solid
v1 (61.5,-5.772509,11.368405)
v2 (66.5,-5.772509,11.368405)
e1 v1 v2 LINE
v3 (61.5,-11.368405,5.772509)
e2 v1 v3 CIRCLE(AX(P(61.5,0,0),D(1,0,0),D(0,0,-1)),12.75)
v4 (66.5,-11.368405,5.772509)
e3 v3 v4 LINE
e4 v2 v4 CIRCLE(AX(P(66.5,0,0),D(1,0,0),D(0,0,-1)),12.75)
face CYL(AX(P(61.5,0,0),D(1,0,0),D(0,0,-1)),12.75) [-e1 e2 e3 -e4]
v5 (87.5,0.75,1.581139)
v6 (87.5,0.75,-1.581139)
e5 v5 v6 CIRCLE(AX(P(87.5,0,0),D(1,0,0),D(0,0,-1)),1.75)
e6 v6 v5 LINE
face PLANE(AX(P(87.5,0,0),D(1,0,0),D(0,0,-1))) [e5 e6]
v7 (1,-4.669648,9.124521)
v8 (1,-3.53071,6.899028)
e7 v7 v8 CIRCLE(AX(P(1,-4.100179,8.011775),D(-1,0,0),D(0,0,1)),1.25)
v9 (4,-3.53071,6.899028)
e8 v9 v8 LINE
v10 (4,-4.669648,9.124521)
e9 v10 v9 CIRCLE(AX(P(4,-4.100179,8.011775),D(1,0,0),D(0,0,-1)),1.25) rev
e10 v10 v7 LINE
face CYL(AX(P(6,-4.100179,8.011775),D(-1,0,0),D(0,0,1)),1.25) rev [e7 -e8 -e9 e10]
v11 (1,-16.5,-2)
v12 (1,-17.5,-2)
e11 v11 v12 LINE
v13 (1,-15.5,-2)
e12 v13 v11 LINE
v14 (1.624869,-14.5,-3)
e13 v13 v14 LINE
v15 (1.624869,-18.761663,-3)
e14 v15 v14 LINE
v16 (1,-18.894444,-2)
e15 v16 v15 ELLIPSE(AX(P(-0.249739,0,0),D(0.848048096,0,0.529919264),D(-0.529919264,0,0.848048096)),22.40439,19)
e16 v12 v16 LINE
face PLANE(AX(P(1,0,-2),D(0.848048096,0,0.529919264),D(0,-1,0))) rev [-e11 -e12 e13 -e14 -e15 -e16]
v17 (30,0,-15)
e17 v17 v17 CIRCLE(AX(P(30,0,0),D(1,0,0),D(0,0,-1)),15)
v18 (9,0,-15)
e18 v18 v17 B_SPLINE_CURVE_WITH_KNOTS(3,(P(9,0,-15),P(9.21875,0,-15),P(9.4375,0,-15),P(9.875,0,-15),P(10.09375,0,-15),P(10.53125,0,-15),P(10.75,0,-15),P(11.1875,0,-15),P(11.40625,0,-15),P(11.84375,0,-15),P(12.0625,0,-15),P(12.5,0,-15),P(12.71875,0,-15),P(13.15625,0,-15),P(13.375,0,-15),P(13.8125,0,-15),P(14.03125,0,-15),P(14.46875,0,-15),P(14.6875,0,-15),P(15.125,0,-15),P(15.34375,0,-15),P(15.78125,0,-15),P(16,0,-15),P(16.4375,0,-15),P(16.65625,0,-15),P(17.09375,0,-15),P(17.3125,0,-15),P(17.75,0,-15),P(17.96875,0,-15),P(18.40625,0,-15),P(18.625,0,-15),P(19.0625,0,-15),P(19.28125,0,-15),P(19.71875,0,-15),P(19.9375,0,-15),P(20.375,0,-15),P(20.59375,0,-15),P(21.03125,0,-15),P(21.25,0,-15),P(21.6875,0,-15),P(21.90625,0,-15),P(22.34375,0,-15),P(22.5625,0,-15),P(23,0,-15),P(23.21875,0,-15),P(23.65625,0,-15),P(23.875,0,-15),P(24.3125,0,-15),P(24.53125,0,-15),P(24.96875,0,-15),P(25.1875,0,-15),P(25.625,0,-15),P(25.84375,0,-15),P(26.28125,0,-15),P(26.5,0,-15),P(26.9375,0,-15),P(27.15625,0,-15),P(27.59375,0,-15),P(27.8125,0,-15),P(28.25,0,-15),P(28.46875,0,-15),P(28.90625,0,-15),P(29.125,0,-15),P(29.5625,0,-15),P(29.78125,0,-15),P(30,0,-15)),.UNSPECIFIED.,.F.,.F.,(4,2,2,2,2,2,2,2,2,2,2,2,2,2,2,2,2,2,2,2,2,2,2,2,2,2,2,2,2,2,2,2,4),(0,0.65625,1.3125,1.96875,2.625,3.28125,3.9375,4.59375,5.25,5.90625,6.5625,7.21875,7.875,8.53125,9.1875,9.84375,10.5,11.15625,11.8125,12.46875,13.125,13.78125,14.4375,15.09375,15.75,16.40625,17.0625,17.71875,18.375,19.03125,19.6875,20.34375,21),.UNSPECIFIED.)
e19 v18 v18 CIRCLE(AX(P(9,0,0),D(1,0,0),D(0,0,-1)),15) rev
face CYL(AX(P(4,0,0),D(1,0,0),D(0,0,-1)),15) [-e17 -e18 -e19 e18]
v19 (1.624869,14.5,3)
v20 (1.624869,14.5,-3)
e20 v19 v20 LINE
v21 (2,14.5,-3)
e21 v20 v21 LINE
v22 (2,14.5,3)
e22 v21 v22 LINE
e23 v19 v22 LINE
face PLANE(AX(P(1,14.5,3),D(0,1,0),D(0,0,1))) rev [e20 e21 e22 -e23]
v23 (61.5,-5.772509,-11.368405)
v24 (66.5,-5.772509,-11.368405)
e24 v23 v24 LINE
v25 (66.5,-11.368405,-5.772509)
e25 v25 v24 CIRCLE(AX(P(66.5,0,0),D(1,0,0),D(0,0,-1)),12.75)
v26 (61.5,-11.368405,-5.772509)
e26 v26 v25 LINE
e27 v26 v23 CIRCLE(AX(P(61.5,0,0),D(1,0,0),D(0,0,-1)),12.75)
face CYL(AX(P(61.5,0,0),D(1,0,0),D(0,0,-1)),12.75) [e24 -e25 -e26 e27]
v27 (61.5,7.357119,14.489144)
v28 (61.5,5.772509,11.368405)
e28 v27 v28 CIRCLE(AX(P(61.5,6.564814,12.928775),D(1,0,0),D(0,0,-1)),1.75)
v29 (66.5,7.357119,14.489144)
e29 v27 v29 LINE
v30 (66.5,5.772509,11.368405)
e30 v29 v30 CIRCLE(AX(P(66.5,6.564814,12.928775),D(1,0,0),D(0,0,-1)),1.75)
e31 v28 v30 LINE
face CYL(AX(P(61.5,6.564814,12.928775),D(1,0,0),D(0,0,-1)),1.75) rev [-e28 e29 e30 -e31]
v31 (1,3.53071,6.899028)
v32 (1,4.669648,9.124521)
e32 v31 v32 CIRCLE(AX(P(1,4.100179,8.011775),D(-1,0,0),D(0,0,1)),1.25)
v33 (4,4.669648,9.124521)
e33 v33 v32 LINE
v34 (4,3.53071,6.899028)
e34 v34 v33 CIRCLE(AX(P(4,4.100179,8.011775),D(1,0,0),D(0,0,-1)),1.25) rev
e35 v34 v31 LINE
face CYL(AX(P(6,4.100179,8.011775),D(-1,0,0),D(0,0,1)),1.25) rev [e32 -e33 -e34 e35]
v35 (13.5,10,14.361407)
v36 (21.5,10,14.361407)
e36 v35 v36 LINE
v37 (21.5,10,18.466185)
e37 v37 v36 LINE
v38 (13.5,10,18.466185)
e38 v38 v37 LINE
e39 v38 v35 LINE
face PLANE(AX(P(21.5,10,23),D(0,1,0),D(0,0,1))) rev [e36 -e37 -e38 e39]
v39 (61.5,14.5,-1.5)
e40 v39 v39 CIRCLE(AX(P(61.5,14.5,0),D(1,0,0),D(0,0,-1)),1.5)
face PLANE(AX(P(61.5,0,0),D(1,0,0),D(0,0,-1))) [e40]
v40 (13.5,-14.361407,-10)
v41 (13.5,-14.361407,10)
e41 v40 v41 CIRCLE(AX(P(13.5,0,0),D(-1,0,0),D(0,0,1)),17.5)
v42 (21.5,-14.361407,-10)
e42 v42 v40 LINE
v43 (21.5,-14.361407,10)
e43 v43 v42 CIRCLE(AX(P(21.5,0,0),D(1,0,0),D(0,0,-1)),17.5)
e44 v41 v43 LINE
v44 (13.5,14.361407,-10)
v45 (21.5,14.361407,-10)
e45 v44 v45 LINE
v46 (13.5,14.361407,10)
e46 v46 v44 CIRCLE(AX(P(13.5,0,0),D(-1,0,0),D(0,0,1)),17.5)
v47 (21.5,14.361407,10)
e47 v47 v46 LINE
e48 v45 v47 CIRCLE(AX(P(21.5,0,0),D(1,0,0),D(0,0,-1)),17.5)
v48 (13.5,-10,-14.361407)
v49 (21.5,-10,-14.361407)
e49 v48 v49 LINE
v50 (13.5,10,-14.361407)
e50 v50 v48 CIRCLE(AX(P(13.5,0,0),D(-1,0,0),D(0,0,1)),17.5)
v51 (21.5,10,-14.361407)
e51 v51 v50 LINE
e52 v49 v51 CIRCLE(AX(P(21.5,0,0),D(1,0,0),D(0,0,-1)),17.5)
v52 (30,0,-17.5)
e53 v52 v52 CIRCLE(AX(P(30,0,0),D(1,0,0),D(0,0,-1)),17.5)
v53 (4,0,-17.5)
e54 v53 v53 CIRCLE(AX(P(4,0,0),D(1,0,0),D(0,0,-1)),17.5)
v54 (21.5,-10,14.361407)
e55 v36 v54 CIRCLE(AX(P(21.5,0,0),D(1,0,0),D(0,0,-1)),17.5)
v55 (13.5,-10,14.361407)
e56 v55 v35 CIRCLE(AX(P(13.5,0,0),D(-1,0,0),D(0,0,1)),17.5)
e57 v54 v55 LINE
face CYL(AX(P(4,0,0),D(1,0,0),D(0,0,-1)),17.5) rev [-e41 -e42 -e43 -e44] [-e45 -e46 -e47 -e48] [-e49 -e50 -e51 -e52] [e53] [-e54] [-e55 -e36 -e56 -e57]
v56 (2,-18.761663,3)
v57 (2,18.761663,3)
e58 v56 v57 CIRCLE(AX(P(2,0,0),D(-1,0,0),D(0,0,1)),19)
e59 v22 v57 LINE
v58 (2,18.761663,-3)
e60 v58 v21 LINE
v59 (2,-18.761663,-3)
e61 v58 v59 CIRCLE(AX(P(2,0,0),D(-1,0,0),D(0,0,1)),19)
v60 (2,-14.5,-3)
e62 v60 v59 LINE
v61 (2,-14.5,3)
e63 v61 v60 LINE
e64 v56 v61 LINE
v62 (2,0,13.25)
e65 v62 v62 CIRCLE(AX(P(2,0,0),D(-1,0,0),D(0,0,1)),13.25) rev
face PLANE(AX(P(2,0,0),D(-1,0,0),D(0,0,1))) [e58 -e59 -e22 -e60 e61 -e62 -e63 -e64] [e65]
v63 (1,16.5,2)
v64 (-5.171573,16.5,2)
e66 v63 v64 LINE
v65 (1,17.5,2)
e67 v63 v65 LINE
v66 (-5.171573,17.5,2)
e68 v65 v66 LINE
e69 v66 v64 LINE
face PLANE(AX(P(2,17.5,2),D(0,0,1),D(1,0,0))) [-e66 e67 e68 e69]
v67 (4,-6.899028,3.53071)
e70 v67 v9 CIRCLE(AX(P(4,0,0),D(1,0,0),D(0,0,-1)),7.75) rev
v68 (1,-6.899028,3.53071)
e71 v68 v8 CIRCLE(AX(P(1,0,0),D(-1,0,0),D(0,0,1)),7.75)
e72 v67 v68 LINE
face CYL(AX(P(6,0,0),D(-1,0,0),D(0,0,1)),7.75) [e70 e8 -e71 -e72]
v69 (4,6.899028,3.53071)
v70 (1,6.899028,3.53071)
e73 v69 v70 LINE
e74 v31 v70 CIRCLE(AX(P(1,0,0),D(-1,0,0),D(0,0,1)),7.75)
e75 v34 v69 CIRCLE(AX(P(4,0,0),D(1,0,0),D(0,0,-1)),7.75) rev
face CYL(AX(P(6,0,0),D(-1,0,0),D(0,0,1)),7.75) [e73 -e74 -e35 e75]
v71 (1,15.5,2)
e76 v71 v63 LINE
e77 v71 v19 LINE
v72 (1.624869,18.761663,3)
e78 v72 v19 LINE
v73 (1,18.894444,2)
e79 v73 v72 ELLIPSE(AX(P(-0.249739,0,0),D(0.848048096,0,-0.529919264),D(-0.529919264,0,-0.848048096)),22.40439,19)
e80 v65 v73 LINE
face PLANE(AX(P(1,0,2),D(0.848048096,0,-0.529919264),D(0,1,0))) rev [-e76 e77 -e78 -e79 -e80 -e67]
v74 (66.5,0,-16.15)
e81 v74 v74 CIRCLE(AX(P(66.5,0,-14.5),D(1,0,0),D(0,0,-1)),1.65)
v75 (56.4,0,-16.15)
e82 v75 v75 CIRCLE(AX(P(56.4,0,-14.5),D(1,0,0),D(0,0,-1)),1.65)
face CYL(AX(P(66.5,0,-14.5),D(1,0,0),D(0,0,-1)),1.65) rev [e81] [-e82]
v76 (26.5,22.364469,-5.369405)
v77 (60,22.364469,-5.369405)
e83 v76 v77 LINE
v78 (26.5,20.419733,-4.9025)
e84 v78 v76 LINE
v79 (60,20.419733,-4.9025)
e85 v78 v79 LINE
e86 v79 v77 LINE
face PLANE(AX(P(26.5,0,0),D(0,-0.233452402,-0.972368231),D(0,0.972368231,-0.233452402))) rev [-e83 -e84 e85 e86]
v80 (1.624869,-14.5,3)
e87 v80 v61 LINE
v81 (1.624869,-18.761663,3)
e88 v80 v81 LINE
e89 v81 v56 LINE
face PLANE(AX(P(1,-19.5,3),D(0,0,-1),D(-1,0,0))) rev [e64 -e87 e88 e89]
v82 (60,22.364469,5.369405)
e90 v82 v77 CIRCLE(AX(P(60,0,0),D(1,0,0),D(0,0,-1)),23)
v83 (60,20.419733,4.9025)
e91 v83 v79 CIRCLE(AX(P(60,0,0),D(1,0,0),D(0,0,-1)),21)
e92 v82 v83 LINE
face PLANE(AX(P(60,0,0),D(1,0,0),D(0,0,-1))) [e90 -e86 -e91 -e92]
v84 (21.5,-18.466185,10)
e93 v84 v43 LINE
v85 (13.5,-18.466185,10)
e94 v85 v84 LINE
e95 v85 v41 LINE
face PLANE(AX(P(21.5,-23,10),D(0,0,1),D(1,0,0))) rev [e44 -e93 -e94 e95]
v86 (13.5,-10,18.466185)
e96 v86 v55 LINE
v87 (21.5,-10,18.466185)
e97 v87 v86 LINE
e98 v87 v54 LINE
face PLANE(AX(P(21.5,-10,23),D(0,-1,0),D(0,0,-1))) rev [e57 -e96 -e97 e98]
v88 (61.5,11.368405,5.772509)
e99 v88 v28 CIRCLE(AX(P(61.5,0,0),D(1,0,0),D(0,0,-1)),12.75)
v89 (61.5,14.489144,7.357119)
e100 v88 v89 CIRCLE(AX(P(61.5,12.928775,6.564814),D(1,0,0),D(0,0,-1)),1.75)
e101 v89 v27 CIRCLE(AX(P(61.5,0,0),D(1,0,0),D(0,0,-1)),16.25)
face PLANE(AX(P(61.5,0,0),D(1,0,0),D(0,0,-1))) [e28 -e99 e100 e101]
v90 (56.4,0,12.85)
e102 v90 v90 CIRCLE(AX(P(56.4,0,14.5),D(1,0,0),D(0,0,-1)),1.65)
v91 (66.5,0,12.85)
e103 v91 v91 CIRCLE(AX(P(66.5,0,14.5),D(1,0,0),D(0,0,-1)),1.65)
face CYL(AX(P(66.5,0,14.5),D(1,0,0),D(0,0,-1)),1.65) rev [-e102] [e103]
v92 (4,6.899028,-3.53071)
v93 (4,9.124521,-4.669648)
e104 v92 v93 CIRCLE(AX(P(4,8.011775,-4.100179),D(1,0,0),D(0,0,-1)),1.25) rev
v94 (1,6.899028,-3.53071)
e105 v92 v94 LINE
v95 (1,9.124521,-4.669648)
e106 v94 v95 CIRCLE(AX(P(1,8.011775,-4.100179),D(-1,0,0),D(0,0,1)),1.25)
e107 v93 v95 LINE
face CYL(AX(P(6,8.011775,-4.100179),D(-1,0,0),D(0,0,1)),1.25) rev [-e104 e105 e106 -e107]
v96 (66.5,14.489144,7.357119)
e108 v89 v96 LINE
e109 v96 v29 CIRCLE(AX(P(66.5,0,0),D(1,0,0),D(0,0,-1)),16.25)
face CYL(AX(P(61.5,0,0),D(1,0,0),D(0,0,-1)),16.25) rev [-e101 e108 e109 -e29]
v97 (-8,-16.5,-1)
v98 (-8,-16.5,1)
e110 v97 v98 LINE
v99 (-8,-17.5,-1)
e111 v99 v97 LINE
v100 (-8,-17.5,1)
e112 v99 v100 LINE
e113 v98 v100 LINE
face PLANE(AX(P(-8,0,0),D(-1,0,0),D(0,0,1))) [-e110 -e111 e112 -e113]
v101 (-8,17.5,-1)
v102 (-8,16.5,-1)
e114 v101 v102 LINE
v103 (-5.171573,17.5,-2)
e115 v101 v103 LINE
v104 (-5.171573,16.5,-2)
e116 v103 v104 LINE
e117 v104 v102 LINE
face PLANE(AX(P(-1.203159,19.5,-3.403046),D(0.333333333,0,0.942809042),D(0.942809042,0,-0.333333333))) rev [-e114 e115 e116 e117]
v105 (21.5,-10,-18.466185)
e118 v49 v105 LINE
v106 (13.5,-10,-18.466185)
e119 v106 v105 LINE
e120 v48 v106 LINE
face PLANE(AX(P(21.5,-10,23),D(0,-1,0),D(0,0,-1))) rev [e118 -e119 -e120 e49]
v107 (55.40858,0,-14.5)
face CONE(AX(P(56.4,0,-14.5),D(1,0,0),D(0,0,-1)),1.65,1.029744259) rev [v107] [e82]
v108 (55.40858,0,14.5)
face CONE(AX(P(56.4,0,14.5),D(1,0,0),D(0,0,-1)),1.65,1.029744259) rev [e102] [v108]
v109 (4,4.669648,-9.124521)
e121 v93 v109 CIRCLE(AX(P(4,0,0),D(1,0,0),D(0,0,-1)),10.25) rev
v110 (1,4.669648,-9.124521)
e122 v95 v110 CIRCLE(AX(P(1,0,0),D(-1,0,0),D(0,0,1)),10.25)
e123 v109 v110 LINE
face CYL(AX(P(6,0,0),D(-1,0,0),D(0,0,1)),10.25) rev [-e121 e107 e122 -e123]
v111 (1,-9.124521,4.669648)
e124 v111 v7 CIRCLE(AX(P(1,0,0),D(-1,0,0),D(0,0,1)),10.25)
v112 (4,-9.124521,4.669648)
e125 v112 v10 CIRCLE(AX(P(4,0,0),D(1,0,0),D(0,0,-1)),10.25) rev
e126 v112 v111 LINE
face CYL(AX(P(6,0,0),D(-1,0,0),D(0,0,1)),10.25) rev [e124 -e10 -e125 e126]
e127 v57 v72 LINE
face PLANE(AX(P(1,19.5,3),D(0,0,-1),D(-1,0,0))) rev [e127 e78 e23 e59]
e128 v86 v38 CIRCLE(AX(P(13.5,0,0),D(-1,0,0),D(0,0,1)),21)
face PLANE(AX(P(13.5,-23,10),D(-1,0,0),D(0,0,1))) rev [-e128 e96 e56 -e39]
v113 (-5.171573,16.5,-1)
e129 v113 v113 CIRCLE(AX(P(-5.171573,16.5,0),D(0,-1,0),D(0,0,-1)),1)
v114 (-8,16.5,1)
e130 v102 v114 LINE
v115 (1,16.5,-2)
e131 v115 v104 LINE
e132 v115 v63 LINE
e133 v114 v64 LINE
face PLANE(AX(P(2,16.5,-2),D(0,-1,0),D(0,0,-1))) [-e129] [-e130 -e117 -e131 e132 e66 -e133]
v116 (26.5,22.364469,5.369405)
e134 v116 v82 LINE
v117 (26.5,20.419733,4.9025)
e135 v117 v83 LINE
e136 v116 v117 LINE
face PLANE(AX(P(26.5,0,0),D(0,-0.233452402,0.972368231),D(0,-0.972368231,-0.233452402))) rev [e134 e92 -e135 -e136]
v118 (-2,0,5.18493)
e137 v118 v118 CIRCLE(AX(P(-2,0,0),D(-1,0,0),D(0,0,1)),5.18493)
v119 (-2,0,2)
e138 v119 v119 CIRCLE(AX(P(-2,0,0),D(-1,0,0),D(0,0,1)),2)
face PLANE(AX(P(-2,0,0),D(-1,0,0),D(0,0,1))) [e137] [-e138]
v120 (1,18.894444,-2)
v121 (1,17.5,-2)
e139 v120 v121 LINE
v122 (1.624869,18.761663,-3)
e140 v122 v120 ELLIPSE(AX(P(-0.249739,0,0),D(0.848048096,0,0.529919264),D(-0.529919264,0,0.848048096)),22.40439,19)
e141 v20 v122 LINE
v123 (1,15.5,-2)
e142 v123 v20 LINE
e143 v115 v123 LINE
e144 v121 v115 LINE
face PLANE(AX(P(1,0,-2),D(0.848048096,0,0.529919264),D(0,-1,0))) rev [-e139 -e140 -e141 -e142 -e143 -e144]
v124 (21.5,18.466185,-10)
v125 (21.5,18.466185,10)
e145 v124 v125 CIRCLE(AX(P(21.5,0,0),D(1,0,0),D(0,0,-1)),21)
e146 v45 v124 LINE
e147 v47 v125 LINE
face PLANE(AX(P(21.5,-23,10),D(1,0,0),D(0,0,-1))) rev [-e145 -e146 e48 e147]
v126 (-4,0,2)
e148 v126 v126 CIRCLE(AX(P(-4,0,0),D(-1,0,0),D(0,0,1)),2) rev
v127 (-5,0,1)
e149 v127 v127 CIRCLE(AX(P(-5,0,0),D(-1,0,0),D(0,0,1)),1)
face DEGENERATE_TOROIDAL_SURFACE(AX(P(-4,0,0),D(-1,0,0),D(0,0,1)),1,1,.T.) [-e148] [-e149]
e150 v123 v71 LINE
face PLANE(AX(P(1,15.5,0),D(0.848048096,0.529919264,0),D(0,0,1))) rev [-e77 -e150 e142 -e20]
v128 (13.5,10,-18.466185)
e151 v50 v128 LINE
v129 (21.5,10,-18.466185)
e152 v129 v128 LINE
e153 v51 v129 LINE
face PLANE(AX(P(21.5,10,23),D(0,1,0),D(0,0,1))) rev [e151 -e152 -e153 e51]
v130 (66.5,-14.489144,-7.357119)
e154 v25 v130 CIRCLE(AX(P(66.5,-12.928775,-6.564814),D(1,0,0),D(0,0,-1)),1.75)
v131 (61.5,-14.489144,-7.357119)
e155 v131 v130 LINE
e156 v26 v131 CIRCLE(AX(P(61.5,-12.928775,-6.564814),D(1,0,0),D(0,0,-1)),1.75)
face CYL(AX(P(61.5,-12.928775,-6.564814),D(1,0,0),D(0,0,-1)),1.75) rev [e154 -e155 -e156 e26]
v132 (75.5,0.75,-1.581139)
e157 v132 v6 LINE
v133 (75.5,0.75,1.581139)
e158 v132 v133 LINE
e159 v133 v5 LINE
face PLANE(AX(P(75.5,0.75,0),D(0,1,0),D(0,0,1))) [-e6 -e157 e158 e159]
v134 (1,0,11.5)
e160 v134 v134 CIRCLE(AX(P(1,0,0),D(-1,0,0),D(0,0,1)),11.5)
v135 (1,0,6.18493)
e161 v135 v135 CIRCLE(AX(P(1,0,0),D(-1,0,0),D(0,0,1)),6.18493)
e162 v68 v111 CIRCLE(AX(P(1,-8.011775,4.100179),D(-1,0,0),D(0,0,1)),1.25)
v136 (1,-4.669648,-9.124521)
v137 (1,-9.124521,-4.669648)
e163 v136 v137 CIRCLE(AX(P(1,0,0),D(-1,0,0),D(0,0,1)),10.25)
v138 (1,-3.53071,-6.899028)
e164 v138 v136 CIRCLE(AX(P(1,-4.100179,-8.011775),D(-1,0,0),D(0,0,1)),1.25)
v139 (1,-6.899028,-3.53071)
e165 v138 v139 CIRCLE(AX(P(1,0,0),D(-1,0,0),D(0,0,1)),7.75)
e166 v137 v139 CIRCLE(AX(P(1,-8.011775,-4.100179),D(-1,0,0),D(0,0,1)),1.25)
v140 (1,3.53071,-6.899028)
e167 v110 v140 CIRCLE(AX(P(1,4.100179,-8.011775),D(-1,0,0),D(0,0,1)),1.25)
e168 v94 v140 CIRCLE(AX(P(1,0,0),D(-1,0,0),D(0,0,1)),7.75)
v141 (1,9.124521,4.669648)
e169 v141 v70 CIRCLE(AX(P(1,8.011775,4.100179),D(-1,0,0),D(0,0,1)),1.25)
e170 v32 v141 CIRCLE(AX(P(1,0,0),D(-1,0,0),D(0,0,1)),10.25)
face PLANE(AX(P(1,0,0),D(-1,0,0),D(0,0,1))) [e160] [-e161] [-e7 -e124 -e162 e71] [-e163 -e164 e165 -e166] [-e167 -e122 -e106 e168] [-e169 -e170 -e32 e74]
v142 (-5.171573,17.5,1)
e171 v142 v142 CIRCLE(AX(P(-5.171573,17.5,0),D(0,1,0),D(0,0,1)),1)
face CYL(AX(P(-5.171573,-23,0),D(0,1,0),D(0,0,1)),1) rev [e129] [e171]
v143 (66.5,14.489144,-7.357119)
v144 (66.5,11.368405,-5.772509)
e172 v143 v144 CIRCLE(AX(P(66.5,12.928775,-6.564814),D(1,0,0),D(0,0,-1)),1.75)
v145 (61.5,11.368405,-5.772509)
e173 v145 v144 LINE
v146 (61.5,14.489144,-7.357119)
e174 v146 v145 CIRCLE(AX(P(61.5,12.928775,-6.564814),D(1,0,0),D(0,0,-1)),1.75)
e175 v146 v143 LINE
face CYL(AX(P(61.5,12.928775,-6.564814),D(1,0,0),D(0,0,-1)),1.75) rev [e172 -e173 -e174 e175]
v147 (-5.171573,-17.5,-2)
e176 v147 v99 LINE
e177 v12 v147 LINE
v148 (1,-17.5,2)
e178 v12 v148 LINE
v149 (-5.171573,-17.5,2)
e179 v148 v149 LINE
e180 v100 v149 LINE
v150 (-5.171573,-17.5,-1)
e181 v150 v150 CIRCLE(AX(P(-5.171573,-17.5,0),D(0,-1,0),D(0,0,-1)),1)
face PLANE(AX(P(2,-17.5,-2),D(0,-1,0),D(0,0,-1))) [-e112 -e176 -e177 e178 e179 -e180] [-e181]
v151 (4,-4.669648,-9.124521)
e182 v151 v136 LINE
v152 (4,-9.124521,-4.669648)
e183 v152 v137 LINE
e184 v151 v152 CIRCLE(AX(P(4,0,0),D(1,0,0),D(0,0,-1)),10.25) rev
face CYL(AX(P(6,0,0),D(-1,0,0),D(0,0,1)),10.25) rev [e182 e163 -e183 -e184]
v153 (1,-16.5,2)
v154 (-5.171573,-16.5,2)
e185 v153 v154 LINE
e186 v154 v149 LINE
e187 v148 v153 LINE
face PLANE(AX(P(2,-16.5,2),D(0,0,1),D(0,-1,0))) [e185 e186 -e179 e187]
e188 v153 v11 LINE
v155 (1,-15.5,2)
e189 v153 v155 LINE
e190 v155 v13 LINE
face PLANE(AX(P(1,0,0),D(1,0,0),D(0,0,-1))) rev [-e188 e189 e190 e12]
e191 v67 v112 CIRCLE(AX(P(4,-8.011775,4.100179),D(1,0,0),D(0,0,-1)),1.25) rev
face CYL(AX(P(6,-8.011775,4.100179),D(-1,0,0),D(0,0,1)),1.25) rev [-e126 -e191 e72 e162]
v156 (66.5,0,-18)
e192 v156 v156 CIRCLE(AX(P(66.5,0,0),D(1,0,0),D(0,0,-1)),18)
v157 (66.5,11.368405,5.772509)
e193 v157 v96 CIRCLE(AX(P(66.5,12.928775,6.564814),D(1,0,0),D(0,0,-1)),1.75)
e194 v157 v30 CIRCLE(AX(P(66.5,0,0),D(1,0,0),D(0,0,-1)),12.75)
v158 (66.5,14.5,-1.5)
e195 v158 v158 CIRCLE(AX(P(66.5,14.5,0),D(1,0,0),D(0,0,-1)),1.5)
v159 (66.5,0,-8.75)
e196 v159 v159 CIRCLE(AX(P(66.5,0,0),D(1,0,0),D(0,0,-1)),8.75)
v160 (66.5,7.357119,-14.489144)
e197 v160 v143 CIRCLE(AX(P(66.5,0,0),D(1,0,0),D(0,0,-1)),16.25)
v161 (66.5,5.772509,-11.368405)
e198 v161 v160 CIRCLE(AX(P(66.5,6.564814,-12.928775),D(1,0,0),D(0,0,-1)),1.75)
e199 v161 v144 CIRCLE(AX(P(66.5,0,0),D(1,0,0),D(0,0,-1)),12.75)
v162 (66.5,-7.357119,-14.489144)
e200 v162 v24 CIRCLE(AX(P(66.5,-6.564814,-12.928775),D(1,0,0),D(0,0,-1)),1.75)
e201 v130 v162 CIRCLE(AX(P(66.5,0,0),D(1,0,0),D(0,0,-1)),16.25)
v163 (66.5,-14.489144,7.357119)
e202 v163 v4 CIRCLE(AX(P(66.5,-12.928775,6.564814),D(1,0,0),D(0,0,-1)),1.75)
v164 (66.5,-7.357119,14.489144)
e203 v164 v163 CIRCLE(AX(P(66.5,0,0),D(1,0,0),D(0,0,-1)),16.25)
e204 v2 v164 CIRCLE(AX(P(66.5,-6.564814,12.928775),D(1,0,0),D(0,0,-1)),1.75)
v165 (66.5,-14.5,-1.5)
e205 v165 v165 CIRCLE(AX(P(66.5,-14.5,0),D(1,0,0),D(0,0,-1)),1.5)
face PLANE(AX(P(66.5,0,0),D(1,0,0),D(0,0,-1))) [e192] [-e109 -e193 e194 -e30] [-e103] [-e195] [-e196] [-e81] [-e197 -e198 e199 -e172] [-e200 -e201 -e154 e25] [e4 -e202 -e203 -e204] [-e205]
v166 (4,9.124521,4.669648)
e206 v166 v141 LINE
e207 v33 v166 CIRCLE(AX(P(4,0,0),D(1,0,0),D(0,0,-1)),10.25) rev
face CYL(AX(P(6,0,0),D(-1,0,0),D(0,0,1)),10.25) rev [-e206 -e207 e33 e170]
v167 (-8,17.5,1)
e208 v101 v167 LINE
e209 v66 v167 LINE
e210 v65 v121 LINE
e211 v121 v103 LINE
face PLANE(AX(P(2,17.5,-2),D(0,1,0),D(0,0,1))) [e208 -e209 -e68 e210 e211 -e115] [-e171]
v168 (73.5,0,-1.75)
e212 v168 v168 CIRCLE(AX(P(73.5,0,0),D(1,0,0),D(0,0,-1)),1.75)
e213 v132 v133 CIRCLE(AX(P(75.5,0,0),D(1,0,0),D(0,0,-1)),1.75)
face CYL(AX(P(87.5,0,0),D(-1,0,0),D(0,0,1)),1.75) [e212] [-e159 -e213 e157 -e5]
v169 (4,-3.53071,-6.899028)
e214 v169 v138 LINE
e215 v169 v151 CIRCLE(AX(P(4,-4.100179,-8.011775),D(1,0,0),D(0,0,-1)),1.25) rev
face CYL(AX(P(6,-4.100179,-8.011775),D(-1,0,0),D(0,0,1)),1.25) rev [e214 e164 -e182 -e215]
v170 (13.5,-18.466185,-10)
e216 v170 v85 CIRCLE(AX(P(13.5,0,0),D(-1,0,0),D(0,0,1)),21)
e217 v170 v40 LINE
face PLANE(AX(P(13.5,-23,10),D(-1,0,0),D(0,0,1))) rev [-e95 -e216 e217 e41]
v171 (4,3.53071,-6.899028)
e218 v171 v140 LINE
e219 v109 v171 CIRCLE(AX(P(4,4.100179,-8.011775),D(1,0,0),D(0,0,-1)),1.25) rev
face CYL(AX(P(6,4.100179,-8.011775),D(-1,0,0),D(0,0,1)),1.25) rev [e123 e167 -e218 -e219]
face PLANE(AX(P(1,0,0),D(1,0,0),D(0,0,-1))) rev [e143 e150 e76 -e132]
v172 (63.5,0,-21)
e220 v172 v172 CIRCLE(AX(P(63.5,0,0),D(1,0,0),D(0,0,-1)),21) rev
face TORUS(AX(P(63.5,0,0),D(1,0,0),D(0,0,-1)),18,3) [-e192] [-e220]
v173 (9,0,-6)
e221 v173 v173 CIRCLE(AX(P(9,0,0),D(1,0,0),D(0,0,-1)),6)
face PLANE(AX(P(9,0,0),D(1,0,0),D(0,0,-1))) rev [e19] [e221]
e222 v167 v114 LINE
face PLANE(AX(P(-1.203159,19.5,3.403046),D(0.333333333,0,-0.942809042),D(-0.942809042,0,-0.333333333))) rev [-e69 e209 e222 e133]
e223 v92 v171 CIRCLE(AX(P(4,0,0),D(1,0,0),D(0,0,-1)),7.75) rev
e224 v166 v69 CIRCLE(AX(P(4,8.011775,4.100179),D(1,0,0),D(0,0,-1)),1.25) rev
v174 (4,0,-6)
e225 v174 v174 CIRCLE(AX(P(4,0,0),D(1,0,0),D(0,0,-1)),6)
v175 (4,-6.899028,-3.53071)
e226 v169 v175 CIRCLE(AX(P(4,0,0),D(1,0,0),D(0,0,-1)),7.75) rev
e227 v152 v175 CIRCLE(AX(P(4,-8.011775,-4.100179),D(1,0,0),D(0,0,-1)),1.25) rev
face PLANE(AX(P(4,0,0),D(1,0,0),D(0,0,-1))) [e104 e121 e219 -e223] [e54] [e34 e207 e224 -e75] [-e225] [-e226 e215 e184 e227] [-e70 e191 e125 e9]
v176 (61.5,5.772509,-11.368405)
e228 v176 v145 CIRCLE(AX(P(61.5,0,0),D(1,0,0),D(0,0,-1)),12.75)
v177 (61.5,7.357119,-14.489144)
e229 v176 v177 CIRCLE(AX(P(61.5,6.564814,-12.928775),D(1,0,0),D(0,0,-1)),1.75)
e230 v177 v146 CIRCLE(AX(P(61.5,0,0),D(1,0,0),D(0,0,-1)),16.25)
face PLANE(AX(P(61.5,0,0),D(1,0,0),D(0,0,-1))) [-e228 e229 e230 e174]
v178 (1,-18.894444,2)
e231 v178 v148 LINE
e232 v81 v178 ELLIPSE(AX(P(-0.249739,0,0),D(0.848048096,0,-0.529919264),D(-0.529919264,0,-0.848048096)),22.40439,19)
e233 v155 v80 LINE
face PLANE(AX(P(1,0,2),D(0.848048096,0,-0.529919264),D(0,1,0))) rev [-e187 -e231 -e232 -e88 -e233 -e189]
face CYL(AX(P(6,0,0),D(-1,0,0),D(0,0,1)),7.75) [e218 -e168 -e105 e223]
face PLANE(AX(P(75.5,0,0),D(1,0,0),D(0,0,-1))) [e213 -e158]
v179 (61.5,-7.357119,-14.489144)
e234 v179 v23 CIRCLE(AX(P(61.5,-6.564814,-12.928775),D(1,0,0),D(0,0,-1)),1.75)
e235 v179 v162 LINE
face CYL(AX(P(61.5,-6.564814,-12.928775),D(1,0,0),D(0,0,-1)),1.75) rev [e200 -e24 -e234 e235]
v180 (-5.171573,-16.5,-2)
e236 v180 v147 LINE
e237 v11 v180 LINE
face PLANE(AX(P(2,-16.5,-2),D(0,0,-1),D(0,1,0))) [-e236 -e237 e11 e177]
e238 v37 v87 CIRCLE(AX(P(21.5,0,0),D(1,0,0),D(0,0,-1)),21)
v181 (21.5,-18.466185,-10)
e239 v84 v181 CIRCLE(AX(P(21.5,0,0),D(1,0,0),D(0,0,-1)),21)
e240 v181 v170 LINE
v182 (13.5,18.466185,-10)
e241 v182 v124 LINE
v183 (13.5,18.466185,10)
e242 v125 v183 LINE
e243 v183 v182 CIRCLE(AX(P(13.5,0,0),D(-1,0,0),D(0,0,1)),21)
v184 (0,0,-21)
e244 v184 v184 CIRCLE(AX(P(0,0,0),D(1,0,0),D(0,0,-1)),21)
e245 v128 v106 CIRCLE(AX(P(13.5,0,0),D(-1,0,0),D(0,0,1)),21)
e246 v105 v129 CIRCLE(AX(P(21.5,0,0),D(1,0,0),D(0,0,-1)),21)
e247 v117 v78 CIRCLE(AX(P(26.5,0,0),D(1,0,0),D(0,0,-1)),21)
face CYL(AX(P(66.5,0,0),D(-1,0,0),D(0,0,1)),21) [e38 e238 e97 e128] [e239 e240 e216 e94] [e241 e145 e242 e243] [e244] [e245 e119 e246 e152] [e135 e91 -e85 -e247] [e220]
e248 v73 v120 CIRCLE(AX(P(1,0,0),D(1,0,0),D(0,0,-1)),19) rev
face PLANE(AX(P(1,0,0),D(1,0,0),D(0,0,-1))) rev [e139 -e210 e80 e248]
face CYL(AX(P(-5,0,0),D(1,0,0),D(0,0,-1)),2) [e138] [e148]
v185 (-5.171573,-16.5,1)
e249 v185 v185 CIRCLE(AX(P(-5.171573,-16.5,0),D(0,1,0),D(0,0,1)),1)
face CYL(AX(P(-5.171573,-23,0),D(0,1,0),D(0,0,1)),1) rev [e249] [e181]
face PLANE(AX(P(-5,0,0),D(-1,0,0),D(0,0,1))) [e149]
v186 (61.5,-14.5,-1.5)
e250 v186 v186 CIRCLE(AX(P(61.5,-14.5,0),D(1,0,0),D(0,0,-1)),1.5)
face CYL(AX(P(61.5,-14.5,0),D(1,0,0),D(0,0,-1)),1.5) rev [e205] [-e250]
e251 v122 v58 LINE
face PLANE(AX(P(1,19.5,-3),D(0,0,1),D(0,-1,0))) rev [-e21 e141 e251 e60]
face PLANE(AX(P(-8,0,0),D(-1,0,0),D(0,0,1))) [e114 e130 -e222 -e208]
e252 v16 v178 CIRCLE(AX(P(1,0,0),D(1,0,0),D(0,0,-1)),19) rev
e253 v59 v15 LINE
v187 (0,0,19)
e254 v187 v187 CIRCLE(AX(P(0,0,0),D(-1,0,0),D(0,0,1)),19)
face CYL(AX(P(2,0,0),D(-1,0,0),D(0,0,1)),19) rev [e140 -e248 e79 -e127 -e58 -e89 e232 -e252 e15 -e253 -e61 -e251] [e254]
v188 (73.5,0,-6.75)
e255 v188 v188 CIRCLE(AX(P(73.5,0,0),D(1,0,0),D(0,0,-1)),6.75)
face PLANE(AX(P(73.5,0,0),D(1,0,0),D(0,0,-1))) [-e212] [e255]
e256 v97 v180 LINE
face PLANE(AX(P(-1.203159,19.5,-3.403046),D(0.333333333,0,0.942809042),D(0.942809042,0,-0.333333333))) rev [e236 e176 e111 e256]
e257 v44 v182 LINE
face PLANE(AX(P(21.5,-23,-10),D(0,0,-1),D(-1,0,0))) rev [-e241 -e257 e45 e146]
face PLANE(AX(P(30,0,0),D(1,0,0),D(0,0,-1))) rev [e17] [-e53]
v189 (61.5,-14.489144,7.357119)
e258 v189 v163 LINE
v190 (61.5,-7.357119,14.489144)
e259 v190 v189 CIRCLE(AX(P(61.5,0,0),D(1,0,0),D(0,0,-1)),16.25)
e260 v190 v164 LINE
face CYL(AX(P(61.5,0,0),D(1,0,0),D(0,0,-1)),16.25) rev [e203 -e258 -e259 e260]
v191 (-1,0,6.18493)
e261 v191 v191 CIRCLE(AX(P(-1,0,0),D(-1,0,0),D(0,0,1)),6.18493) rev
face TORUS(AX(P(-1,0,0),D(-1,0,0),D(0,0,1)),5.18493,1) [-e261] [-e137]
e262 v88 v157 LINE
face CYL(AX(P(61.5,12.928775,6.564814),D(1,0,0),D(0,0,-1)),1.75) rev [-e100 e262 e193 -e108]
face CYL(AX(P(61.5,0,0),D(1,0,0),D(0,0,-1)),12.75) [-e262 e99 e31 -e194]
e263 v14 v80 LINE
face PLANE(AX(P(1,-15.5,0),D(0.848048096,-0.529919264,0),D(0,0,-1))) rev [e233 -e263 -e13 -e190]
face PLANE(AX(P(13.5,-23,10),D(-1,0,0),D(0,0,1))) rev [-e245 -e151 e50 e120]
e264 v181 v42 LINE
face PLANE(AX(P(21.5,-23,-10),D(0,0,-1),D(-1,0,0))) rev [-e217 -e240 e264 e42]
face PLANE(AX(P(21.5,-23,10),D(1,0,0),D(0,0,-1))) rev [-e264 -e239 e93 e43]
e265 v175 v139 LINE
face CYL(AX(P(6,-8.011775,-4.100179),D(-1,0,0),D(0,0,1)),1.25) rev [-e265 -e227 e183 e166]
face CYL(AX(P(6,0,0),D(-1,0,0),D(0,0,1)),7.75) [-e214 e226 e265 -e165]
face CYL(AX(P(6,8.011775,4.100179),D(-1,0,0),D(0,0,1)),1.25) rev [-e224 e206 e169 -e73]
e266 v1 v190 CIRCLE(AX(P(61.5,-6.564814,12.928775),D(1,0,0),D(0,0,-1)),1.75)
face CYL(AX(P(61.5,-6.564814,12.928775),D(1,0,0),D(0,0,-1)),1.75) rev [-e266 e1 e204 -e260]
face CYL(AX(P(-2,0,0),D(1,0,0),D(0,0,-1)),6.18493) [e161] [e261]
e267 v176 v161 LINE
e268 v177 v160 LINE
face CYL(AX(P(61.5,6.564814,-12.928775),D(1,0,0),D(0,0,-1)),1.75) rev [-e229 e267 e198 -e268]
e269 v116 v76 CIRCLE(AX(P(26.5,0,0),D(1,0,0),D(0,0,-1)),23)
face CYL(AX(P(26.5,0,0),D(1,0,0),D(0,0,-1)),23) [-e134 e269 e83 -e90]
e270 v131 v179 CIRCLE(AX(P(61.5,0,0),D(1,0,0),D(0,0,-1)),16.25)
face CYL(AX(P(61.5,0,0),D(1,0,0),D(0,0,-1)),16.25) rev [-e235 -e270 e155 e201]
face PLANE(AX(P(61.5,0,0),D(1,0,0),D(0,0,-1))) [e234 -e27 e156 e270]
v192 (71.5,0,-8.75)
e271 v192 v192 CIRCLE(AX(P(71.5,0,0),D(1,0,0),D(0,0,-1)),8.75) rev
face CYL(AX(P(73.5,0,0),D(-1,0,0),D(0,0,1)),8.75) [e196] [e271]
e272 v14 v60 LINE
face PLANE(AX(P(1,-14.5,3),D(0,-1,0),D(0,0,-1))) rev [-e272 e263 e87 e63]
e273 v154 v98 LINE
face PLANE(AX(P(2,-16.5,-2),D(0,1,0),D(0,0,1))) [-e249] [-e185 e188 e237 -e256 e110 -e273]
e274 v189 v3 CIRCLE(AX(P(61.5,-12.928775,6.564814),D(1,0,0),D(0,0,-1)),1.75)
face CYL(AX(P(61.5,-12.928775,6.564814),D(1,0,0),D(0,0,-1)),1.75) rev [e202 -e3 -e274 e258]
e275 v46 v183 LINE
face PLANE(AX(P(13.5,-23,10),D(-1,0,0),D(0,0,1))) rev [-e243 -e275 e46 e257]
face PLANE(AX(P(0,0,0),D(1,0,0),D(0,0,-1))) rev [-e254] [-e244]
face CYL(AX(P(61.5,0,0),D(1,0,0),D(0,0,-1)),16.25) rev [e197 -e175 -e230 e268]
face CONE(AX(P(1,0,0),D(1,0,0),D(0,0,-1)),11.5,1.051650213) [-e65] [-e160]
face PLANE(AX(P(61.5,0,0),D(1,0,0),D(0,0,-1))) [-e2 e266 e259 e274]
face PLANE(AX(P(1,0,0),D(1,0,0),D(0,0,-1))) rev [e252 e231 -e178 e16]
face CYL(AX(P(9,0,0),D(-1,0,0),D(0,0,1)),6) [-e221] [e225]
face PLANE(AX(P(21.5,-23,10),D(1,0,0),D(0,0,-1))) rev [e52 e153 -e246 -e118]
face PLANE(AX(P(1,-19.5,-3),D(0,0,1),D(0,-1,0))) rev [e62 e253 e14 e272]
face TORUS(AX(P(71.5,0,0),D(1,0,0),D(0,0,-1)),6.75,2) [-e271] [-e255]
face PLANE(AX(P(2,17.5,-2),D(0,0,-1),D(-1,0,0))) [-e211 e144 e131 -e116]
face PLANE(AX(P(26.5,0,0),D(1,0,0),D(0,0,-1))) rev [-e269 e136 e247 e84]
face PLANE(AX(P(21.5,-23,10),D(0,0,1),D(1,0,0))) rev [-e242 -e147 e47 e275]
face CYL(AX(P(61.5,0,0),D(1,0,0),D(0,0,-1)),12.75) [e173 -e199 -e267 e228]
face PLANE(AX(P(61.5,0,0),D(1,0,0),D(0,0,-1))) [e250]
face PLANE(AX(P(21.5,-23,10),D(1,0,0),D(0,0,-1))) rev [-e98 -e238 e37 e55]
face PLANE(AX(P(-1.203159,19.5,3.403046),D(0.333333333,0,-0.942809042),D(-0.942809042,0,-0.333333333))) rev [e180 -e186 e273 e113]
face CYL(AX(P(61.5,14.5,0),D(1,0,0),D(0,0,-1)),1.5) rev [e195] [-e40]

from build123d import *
from OCP.BRepFilletAPI import BRepFilletAPI_MakeChamfer

# Parameters (mm, degrees)
SKETCH1_R               = 21
BOSS_EXTRUDE1_DEPTH     = 66.5
FILLET1_R               = 3
SKETCH2_R               = 8.75
BOSS_EXTRUDE2_DEPTH     = 7
FILLET2_R               = 2
SKETCH3_R               = 1.75
BOSS_EXTRUDE3_DEPTH     = 14
BOSS_EXTRUDE4_START     = -33.5
BOSS_EXTRUDE4_DEPTH     = 33.5
SKETCH5_R               = 19
SKETCH5_W               = 4
SKETCH5_H               = 1
CUT_EXTRUDE1_DEPTH      = 2
SKETCH5_3_W             = 4
SKETCH5_3_H             = 1
BOSS_EXTRUDE5_DEPTH     = 8
CUT_EXTRUDE2_DEPTH      = 37
SKETCH7_W               = 8
SKETCH7_H               = 20
CUT_EXTRUDE3_DEPTH      = 101.604423362
CIRPATTERN1_COUNT       = 2
CIRPATTERN1_ANGLE       = 90
SKETCH9_R               = 17.5
BOSS_EXTRUDE6_DEPTH     = 64.5
CUT_EXTRUDE4_DEPTH      = 100.123660142
CUT_EXTRUDE4_DEPTH_BACK = 100.123660142
SKETCH10_R              = 1
M4_TAPPED_HOLE1_D       = 3.3
M4_TAPPED_HOLE1_DEPTH   = 10.1
M4_TAPPED_HOLE1_TIP     = 0.991420021
SKETCH11_R              = 1.5
CUT_EXTRUDE6_DEPTH      = 5
SKETCH13_R              = 15
BOSS_EXTRUDE7_DEPTH     = 1
CHAMFER1_SIZE           = 2
CHAMFER1_SIZE_2         = 3.5
SKETCH15_W              = 6
SKETCH15_H              = 5
BOSS_EXTRUDE8_DEPTH     = 1
CHAMFER2_SIZE           = 1
CHAMFER2_SIZE_2         = 0.624869352
SKETCH17_R              = 6.184929539
BOSS_EXTRUDE9_DEPTH     = 3
FILLET3_R               = 1
SKETCH19_R              = 2
BOSS_EXTRUDE10_DEPTH    = 3
FILLET4_R               = 1
CUT_EXTRUDE7_DEPTH      = 5
CUT_EXTRUDE8_START      = -26
SKETCH22_R              = 17.5
SKETCH22_R_2            = 15
CUT_EXTRUDE8_DEPTH      = 26
SKETCH23_R              = 17.5
SKETCH23_R_2            = 6
CUT_EXTRUDE9_DEPTH      = 5
CUT_EXTRUDE10_START     = -12
CUT_EXTRUDE10_DEPTH     = 12


# Some blends are built 0.0001 mm under size
with BuildPart() as part:
    # Sketch1 → Boss-Extrude1 (new body)
    with BuildSketch(Plane(origin=(0, 0, 0), x_dir=(0, 0, -1), z_dir=(1, 0, 0))):
        Circle(SKETCH1_R)
    extrude(amount=BOSS_EXTRUDE1_DEPTH)

    # Fillet1
    fillet1_edges = [part.edges().sort_by_distance(p)[0] for p in [
        (66.5, 0, 21),
    ]]
    fillet(fillet1_edges, radius=FILLET1_R)

    # Sketch2 → Boss-Extrude2 (add)
    with BuildSketch(Plane(origin=(66.5, 0, 0), x_dir=(0, 0, -1), z_dir=(1, 0, 0))):
        Circle(SKETCH2_R)
    extrude(amount=BOSS_EXTRUDE2_DEPTH)

    # Fillet2
    fillet2_edges = [part.edges().sort_by_distance(p)[0] for p in [
        (73.5, 0, 8.75),
    ]]
    fillet(fillet2_edges, radius=FILLET2_R)

    # Sketch3 → Boss-Extrude3 (add)
    with BuildSketch(Plane(origin=(73.5, 0, 0), x_dir=(0, 0, -1), z_dir=(1, 0, 0))):
        Circle(SKETCH3_R)
    extrude(amount=BOSS_EXTRUDE3_DEPTH)

    # Sketch4 → Boss-Extrude4 (add)
    with BuildSketch(Plane(origin=(60, 0, 0), x_dir=(0, 0, -1), z_dir=(1, 0, 0)).offset(BOSS_EXTRUDE4_START)):
        with BuildLine():
            Line((-4.902500441, 20.419732844), (-5.369405245, 22.364469305))
            ThreePointArc((-5.369405245, 22.364469305), (-14.239095466, -18.062340942), (23, 0))
            ThreePointArc((23, 0), (18.062340942, 14.239095466), (5.369405245, 22.364469305))
            Line((5.369405245, 22.364469305), (4.902500441, 20.419732844))
            ThreePointArc((4.902500441, 20.419732844), (16.491702599, 13.000913251), (21, 0))
            ThreePointArc((21, 0), (-13.000913251, -16.491702599), (-4.902500441, 20.419732844))
        make_face()
    extrude(amount=BOSS_EXTRUDE4_DEPTH)

    # Sketch5 → Cut-Extrude1 (cut)
    with BuildSketch(Plane.ZY):
        Circle(SKETCH5_R)
        with Locations((0, 17)):
            Rectangle(SKETCH5_W, SKETCH5_H, mode=Mode.SUBTRACT)
        with Locations((0, -17)):
            Rectangle(SKETCH5_W, SKETCH5_H, mode=Mode.SUBTRACT)
    extrude(amount=-CUT_EXTRUDE1_DEPTH, mode=Mode.SUBTRACT)

    # Sketch5<3> → Boss-Extrude5 (add)
    with BuildSketch(Plane.ZY):
        with Locations((0, 17)):
            Rectangle(SKETCH5_3_W, SKETCH5_3_H)
        with Locations((0, -17)):
            Rectangle(SKETCH5_3_W, SKETCH5_3_H)
    extrude(amount=BOSS_EXTRUDE5_DEPTH)

    # Sketch6 → Cut-Extrude2 (cut)
    with BuildSketch(Plane.XZ.offset(17.5)):
        Polygon((-8, -2), (-5.171572875, -2), (-8, -1), align=None)
        Polygon((-8, 2), (-8, 1), (-5.171572875, 2), align=None)
    extrude(amount=-CUT_EXTRUDE2_DEPTH, mode=Mode.SUBTRACT)

    # Sketch7 → Cut-Extrude3 (cut, through all)
    with BuildSketch(Plane(origin=(0, 21, 0), x_dir=(1, 0, 0), z_dir=(0, 1, 0))):
        with Locations((17.5, 0)):
            Rectangle(SKETCH7_W, SKETCH7_H)
    cut_extrude3 = extrude(amount=-CUT_EXTRUDE3_DEPTH, mode=Mode.SUBTRACT)

    # CirPattern1: Cut-Extrude3 ×2 about axis
    cirpattern1_axis = Axis((0, 0, 0), (-1, 0, 0))
    for i in range(1, CIRPATTERN1_COUNT):
        add(cut_extrude3.rotate(cirpattern1_axis, i * CIRPATTERN1_ANGLE / (CIRPATTERN1_COUNT - 1)), mode=Mode.SUBTRACT)

    # Sketch9 → Boss-Extrude6 (add)
    with BuildSketch(Plane.ZY.offset(-2)):
        Circle(SKETCH9_R)
    extrude(amount=-BOSS_EXTRUDE6_DEPTH)

    # Sketch10 → Cut-Extrude4 (cut, two sides: drawn at the far end of the back side and taken through both)
    with BuildSketch(Plane(origin=(0, 17.5, 0), x_dir=(1, 0, 0), z_dir=(0, 1, 0)).offset(-CUT_EXTRUDE4_DEPTH_BACK)):
        with Locations(Location((-5.171572875, 0, 0), (0, 0, 270))):
            Circle(SKETCH10_R)
    extrude(amount=CUT_EXTRUDE4_DEPTH + CUT_EXTRUDE4_DEPTH_BACK, mode=Mode.SUBTRACT)

    # M4 Tapped Hole1
    with Locations(Plane(origin=(66.5, 0, 14.5), x_dir=(0, 0, 1), z_dir=(1, 0, 0))):
        with Locations((0, 0), (-29, 0)):
            Hole(M4_TAPPED_HOLE1_D / 2, depth=M4_TAPPED_HOLE1_DEPTH)
            with Locations((0, 0, -(M4_TAPPED_HOLE1_DEPTH + M4_TAPPED_HOLE1_TIP / 2))):  # 118° drill point
                Cone(0, M4_TAPPED_HOLE1_D / 2, M4_TAPPED_HOLE1_TIP, mode=Mode.SUBTRACT)

    # Sketch11 → Cut-Extrude6 (cut)
    with BuildSketch(Plane(origin=(66.5, 0, 0), x_dir=(0, 0, -1), z_dir=(1, 0, 0))):
        with Locations((0, -14.5)):
            Circle(SKETCH11_R)
        with Locations((0, 14.5)):
            Circle(SKETCH11_R)
        with BuildLine():
            ThreePointArc((-7.357118947, 14.48914424), (-11.490485194, 11.490485194), (-14.48914424, 7.357118947))
            ThreePointArc((-14.48914424, 7.357118947), (-13.721079977, 5.00444445), (-11.36840548, 5.772508712))
            ThreePointArc((-11.36840548, 5.772508712), (-9.01561146, 9.01561146), (-5.772508712, 11.36840548))
            ThreePointArc((-5.772508712, 11.36840548), (-5.00444445, 13.721079977), (-7.357118947, 14.48914424))
        make_face()
        with BuildLine():
            ThreePointArc((14.48914424, 7.357118947), (11.490485194, 11.490485194), (7.357118947, 14.48914424))
            ThreePointArc((7.357118947, 14.48914424), (5.00444445, 13.721079977), (5.772508712, 11.36840548))
            ThreePointArc((5.772508712, 11.36840548), (9.01561146, 9.01561146), (11.36840548, 5.772508712))
            ThreePointArc((11.36840548, 5.772508712), (13.721079977, 5.00444445), (14.48914424, 7.357118947))
        make_face()
        with BuildLine():
            ThreePointArc((7.357118947, -14.48914424), (11.490485194, -11.490485194), (14.48914424, -7.357118947))
            ThreePointArc((14.48914424, -7.357118947), (13.721079977, -5.00444445), (11.36840548, -5.772508712))
            ThreePointArc((11.36840548, -5.772508712), (9.01561146, -9.01561146), (5.772508712, -11.36840548))
            ThreePointArc((5.772508712, -11.36840548), (5.00444445, -13.721079977), (7.357118947, -14.48914424))
        make_face()
        with BuildLine():
            ThreePointArc((-14.48914424, -7.357118947), (-11.490485194, -11.490485194), (-7.357118947, -14.48914424))
            ThreePointArc((-7.357118947, -14.48914424), (-5.00444445, -13.721079977), (-5.772508712, -11.36840548))
            ThreePointArc((-5.772508712, -11.36840548), (-9.01561146, -9.01561146), (-11.36840548, -5.772508712))
            ThreePointArc((-11.36840548, -5.772508712), (-13.721079977, -5.00444445), (-14.48914424, -7.357118947))
        make_face()
    extrude(amount=-CUT_EXTRUDE6_DEPTH, mode=Mode.SUBTRACT)

    # Sketch13 → Boss-Extrude7 (add)
    with BuildSketch(Plane.ZY.offset(-2)):
        Circle(SKETCH13_R)
    extrude(amount=BOSS_EXTRUDE7_DEPTH)

    # Chamfer1
    # the kernel refuses this chamfer: 3.5, 2 mm, written as the material it takes off along each edge
    with BuildSketch(Plane(origin=(1, 0, 0), x_dir=(0, 0, 1), z_dir=(0, -1, 0))) as chamfer1_piece_1_section:
        Polygon((15, -CHAMFER1_SIZE), (15 - CHAMFER1_SIZE_2, 0), (15, 0), align=None)
    chamfer1_piece_1 = revolve(axis=Axis((1, 0, 0), (-1, 0, 0)), mode=Mode.PRIVATE)
    chamfer1_piece_1 = split(chamfer1_piece_1, bisect_by=Plane(origin=(2, 0, -12.345664859), z_dir=(-1, 0, 0)), keep=Keep.TOP, mode=Mode.PRIVATE)
    add(chamfer1_piece_1, mode=Mode.SUBTRACT)

    # Sketch15 → Boss-Extrude8 (add)
    with BuildSketch(Plane.ZY.offset(-2)):
        with Locations((0, 17)):
            Rectangle(SKETCH15_W, SKETCH15_H)
        with Locations((0, -17)):
            Rectangle(SKETCH15_W, SKETCH15_H)
    extrude(amount=BOSS_EXTRUDE8_DEPTH)

    # Chamfer2
    chamfer2_edges_1 = [part.edges().sort_by_distance(p)[0] for p in [
        (1, 16.63083152, 3),
    ]]
    chamfer2_side_1 = [part.faces().sort_by_distance(p)[0] for p in [
        (1, 16.63083152, 2.987502613),
    ]]
    chamfer2_edges_2 = [part.edges().sort_by_distance(p)[0] for p in [
        (1, 16.63083152, -3),
    ]]
    chamfer2_side_2 = [part.faces().sort_by_distance(p)[0] for p in [
        (1.012497387, 16.63083152, -3),
    ]]
    chamfer2_edges_3 = [part.edges().sort_by_distance(p)[0] for p in [
        (1, 14.5, 0),
    ]]
    chamfer2_side_3 = [part.faces().sort_by_distance(p)[0] for p in [
        (1, 14.512497387, 0),
    ]]
    chamfer2_edges_4 = [part.edges().sort_by_distance(p)[0] for p in [
        (1, -16.63083152, -3),
    ]]
    chamfer2_side_4 = [part.faces().sort_by_distance(p)[0] for p in [
        (1, -16.63083152, -2.987502613),
    ]]
    chamfer2_edges_5 = [part.edges().sort_by_distance(p)[0] for p in [
        (1, -16.63083152, 3),
    ]]
    chamfer2_side_5 = [part.faces().sort_by_distance(p)[0] for p in [
        (1.012497387, -16.63083152, 3),
    ]]
    chamfer2_edges_6 = [part.edges().sort_by_distance(p)[0] for p in [
        (1, -14.5, 0),
    ]]
    chamfer2_side_6 = [part.faces().sort_by_distance(p)[0] for p in [
        (1, -14.512497387, 0),
    ]]
    chamfer2 = BRepFilletAPI_MakeChamfer(part.part.solid().wrapped)
    for e in chamfer2_edges_1:
        chamfer2.Add(CHAMFER2_SIZE - 0.0001, CHAMFER2_SIZE_2 - 0.0001, e.wrapped, chamfer2_side_1[0].wrapped)
    for e in chamfer2_edges_2:
        chamfer2.Add(CHAMFER2_SIZE_2 - 0.0001, CHAMFER2_SIZE - 0.0001, e.wrapped, chamfer2_side_2[0].wrapped)
    for e in chamfer2_edges_3:
        chamfer2.Add(CHAMFER2_SIZE - 0.0001, CHAMFER2_SIZE_2 - 0.0001, e.wrapped, chamfer2_side_3[0].wrapped)
    for e in chamfer2_edges_4:
        chamfer2.Add(CHAMFER2_SIZE - 0.0001, CHAMFER2_SIZE_2 - 0.0001, e.wrapped, chamfer2_side_4[0].wrapped)
    for e in chamfer2_edges_5:
        chamfer2.Add(CHAMFER2_SIZE_2 - 0.0001, CHAMFER2_SIZE - 0.0001, e.wrapped, chamfer2_side_5[0].wrapped)
    for e in chamfer2_edges_6:
        chamfer2.Add(CHAMFER2_SIZE - 0.0001, CHAMFER2_SIZE_2 - 0.0001, e.wrapped, chamfer2_side_6[0].wrapped)
    add(Compound.cast(chamfer2.Shape()), mode=Mode.REPLACE)  # a hair under: the kernel refuses the full size

    # Sketch17 → Boss-Extrude9 (add)
    with BuildSketch(Plane.ZY.offset(-1)):
        Circle(SKETCH17_R)
    extrude(amount=BOSS_EXTRUDE9_DEPTH)

    # Fillet3
    fillet3_edges = [part.edges().sort_by_distance(p)[0] for p in [
        (-2, 0, -6.184929539),
    ]]
    fillet(fillet3_edges, radius=FILLET3_R)

    # Sketch19 → Boss-Extrude10 (add)
    with BuildSketch(Plane.ZY.offset(2)):
        Circle(SKETCH19_R)
    extrude(amount=BOSS_EXTRUDE10_DEPTH)

    # Fillet4
    fillet4_edges = [part.edges().sort_by_distance(p)[0] for p in [
        (-5, 0, -2),
    ]]
    fillet(fillet4_edges, radius=FILLET4_R)

    # Sketch20 → Cut-Extrude7 (cut)
    with BuildSketch(Plane.ZY.offset(-1)):
        with BuildLine():
            ThreePointArc((-8.502595121, -2.950572184), (-6.363961031, -6.363961031), (-2.950572184, -8.502595121))
            ThreePointArc((-2.950572184, -8.502595121), (-2.924737516, -7.586524384), (-3.530709504, -6.899028221))
            ThreePointArc((-3.530709504, -6.899028221), (-5.480077554, -5.480077554), (-6.899028221, -3.530709504))
            ThreePointArc((-6.899028221, -3.530709504), (-7.586524384, -2.924737516), (-8.502595121, -2.950572184))
        make_face()
        with BuildLine():
            ThreePointArc((-4.669648054, -9.124521196), (-3.674928455, -9.187215971), (-2.950572184, -8.502595121))
            ThreePointArc((-2.950572184, -8.502595121), (-6.363961031, -6.363961031), (-8.502595121, -2.950572184))
            ThreePointArc((-8.502595121, -2.950572184), (-9.187215971, -3.674928455), (-9.124521196, -4.669648054))
            ThreePointArc((-9.124521196, -4.669648054), (-7.247844507, -7.247844507), (-4.669648054, -9.124521196))
        make_face()
        with BuildLine():
            ThreePointArc((-3.530709504, 6.899028221), (-2.924737516, 7.586524384), (-2.950572184, 8.502595121))
            ThreePointArc((-2.950572184, 8.502595121), (-6.363961031, 6.363961031), (-8.502595121, 2.950572184))
            ThreePointArc((-8.502595121, 2.950572184), (-7.586524384, 2.924737516), (-6.899028221, 3.530709504))
            ThreePointArc((-6.899028221, 3.530709504), (-5.480077554, 5.480077554), (-3.530709504, 6.899028221))
        make_face()
        with BuildLine():
            ThreePointArc((-8.502595121, 2.950572184), (-6.363961031, 6.363961031), (-2.950572184, 8.502595121))
            ThreePointArc((-2.950572184, 8.502595121), (-3.674928455, 9.187215971), (-4.669648054, 9.124521196))
            ThreePointArc((-4.669648054, 9.124521196), (-7.247844507, 7.247844507), (-9.124521196, 4.669648054))
            ThreePointArc((-9.124521196, 4.669648054), (-9.187215971, 3.674928455), (-8.502595121, 2.950572184))
        make_face()
        with BuildLine():
            ThreePointArc((6.899028221, 3.530709504), (7.586524384, 2.924737516), (8.502595121, 2.950572184))
            ThreePointArc((8.502595121, 2.950572184), (6.363961031, 6.363961031), (2.950572184, 8.502595121))
            ThreePointArc((2.950572184, 8.502595121), (2.924737516, 7.586524384), (3.530709504, 6.899028221))
            ThreePointArc((3.530709504, 6.899028221), (5.480077554, 5.480077554), (6.899028221, 3.530709504))
        make_face()
        with BuildLine():
            ThreePointArc((2.950572184, 8.502595121), (6.363961031, 6.363961031), (8.502595121, 2.950572184))
            ThreePointArc((8.502595121, 2.950572184), (9.187215971, 3.674928455), (9.124521196, 4.669648054))
            ThreePointArc((9.124521196, 4.669648054), (7.247844507, 7.247844507), (4.669648054, 9.124521196))
            ThreePointArc((4.669648054, 9.124521196), (3.674928455, 9.187215971), (2.950572184, 8.502595121))
        make_face()
        with BuildLine():
            ThreePointArc((2.950572184, -8.502595121), (6.363961031, -6.363961031), (8.502595121, -2.950572184))
            ThreePointArc((8.502595121, -2.950572184), (7.586524384, -2.924737516), (6.899028221, -3.530709504))
            ThreePointArc((6.899028221, -3.530709504), (5.480077554, -5.480077554), (3.530709504, -6.899028221))
            ThreePointArc((3.530709504, -6.899028221), (2.924737516, -7.586524384), (2.950572184, -8.502595121))
        make_face()
        with BuildLine():
            ThreePointArc((9.124521196, -4.669648054), (9.187215971, -3.674928455), (8.502595121, -2.950572184))
            ThreePointArc((8.502595121, -2.950572184), (6.363961031, -6.363961031), (2.950572184, -8.502595121))
            ThreePointArc((2.950572184, -8.502595121), (3.674928455, -9.187215971), (4.669648054, -9.124521196))
            ThreePointArc((4.669648054, -9.124521196), (7.247844507, -7.247844507), (9.124521196, -4.669648054))
        make_face()
    extrude(amount=-CUT_EXTRUDE7_DEPTH, mode=Mode.SUBTRACT)

    # Sketch22 → Cut-Extrude8 (cut)
    with BuildSketch(Plane(origin=(30, 0, 0), x_dir=(0, 0, -1), z_dir=(1, 0, 0)).offset(CUT_EXTRUDE8_START)):
        Circle(SKETCH22_R)
        Circle(SKETCH22_R_2, mode=Mode.SUBTRACT)
    extrude(amount=CUT_EXTRUDE8_DEPTH, mode=Mode.SUBTRACT)

    # Sketch23 → Cut-Extrude9 (cut)
    with BuildSketch(Plane(origin=(4, 0, 0), x_dir=(0, 0, -1), z_dir=(1, 0, 0))):
        Circle(SKETCH23_R)
        Circle(SKETCH23_R_2, mode=Mode.SUBTRACT)
    extrude(amount=CUT_EXTRUDE9_DEPTH, mode=Mode.SUBTRACT)

    # Sketch24 → Cut-Extrude10 (cut)
    with BuildSketch(Plane(origin=(87.5, 0, 0), x_dir=(0, 0, -1), z_dir=(1, 0, 0)).offset(CUT_EXTRUDE10_START)):
        with BuildLine():
            Line((0, 0.75), (0, 1.75))
            ThreePointArc((0, 1.75), (-0.935414347, 1.479019946), (-1.58113883, 0.75))
            Line((-1.58113883, 0.75), (0, 0.75))
        make_face()
        with BuildLine():
            ThreePointArc((1.58113883, 0.75), (0.935414347, 1.479019946), (0, 1.75))
            Line((0, 1.75), (0, 0.75))
            Line((0, 0.75), (1.58113883, 0.75))
        make_face()
    extrude(amount=CUT_EXTRUDE10_DEPTH, mode=Mode.SUBTRACT)


solid = part.part
